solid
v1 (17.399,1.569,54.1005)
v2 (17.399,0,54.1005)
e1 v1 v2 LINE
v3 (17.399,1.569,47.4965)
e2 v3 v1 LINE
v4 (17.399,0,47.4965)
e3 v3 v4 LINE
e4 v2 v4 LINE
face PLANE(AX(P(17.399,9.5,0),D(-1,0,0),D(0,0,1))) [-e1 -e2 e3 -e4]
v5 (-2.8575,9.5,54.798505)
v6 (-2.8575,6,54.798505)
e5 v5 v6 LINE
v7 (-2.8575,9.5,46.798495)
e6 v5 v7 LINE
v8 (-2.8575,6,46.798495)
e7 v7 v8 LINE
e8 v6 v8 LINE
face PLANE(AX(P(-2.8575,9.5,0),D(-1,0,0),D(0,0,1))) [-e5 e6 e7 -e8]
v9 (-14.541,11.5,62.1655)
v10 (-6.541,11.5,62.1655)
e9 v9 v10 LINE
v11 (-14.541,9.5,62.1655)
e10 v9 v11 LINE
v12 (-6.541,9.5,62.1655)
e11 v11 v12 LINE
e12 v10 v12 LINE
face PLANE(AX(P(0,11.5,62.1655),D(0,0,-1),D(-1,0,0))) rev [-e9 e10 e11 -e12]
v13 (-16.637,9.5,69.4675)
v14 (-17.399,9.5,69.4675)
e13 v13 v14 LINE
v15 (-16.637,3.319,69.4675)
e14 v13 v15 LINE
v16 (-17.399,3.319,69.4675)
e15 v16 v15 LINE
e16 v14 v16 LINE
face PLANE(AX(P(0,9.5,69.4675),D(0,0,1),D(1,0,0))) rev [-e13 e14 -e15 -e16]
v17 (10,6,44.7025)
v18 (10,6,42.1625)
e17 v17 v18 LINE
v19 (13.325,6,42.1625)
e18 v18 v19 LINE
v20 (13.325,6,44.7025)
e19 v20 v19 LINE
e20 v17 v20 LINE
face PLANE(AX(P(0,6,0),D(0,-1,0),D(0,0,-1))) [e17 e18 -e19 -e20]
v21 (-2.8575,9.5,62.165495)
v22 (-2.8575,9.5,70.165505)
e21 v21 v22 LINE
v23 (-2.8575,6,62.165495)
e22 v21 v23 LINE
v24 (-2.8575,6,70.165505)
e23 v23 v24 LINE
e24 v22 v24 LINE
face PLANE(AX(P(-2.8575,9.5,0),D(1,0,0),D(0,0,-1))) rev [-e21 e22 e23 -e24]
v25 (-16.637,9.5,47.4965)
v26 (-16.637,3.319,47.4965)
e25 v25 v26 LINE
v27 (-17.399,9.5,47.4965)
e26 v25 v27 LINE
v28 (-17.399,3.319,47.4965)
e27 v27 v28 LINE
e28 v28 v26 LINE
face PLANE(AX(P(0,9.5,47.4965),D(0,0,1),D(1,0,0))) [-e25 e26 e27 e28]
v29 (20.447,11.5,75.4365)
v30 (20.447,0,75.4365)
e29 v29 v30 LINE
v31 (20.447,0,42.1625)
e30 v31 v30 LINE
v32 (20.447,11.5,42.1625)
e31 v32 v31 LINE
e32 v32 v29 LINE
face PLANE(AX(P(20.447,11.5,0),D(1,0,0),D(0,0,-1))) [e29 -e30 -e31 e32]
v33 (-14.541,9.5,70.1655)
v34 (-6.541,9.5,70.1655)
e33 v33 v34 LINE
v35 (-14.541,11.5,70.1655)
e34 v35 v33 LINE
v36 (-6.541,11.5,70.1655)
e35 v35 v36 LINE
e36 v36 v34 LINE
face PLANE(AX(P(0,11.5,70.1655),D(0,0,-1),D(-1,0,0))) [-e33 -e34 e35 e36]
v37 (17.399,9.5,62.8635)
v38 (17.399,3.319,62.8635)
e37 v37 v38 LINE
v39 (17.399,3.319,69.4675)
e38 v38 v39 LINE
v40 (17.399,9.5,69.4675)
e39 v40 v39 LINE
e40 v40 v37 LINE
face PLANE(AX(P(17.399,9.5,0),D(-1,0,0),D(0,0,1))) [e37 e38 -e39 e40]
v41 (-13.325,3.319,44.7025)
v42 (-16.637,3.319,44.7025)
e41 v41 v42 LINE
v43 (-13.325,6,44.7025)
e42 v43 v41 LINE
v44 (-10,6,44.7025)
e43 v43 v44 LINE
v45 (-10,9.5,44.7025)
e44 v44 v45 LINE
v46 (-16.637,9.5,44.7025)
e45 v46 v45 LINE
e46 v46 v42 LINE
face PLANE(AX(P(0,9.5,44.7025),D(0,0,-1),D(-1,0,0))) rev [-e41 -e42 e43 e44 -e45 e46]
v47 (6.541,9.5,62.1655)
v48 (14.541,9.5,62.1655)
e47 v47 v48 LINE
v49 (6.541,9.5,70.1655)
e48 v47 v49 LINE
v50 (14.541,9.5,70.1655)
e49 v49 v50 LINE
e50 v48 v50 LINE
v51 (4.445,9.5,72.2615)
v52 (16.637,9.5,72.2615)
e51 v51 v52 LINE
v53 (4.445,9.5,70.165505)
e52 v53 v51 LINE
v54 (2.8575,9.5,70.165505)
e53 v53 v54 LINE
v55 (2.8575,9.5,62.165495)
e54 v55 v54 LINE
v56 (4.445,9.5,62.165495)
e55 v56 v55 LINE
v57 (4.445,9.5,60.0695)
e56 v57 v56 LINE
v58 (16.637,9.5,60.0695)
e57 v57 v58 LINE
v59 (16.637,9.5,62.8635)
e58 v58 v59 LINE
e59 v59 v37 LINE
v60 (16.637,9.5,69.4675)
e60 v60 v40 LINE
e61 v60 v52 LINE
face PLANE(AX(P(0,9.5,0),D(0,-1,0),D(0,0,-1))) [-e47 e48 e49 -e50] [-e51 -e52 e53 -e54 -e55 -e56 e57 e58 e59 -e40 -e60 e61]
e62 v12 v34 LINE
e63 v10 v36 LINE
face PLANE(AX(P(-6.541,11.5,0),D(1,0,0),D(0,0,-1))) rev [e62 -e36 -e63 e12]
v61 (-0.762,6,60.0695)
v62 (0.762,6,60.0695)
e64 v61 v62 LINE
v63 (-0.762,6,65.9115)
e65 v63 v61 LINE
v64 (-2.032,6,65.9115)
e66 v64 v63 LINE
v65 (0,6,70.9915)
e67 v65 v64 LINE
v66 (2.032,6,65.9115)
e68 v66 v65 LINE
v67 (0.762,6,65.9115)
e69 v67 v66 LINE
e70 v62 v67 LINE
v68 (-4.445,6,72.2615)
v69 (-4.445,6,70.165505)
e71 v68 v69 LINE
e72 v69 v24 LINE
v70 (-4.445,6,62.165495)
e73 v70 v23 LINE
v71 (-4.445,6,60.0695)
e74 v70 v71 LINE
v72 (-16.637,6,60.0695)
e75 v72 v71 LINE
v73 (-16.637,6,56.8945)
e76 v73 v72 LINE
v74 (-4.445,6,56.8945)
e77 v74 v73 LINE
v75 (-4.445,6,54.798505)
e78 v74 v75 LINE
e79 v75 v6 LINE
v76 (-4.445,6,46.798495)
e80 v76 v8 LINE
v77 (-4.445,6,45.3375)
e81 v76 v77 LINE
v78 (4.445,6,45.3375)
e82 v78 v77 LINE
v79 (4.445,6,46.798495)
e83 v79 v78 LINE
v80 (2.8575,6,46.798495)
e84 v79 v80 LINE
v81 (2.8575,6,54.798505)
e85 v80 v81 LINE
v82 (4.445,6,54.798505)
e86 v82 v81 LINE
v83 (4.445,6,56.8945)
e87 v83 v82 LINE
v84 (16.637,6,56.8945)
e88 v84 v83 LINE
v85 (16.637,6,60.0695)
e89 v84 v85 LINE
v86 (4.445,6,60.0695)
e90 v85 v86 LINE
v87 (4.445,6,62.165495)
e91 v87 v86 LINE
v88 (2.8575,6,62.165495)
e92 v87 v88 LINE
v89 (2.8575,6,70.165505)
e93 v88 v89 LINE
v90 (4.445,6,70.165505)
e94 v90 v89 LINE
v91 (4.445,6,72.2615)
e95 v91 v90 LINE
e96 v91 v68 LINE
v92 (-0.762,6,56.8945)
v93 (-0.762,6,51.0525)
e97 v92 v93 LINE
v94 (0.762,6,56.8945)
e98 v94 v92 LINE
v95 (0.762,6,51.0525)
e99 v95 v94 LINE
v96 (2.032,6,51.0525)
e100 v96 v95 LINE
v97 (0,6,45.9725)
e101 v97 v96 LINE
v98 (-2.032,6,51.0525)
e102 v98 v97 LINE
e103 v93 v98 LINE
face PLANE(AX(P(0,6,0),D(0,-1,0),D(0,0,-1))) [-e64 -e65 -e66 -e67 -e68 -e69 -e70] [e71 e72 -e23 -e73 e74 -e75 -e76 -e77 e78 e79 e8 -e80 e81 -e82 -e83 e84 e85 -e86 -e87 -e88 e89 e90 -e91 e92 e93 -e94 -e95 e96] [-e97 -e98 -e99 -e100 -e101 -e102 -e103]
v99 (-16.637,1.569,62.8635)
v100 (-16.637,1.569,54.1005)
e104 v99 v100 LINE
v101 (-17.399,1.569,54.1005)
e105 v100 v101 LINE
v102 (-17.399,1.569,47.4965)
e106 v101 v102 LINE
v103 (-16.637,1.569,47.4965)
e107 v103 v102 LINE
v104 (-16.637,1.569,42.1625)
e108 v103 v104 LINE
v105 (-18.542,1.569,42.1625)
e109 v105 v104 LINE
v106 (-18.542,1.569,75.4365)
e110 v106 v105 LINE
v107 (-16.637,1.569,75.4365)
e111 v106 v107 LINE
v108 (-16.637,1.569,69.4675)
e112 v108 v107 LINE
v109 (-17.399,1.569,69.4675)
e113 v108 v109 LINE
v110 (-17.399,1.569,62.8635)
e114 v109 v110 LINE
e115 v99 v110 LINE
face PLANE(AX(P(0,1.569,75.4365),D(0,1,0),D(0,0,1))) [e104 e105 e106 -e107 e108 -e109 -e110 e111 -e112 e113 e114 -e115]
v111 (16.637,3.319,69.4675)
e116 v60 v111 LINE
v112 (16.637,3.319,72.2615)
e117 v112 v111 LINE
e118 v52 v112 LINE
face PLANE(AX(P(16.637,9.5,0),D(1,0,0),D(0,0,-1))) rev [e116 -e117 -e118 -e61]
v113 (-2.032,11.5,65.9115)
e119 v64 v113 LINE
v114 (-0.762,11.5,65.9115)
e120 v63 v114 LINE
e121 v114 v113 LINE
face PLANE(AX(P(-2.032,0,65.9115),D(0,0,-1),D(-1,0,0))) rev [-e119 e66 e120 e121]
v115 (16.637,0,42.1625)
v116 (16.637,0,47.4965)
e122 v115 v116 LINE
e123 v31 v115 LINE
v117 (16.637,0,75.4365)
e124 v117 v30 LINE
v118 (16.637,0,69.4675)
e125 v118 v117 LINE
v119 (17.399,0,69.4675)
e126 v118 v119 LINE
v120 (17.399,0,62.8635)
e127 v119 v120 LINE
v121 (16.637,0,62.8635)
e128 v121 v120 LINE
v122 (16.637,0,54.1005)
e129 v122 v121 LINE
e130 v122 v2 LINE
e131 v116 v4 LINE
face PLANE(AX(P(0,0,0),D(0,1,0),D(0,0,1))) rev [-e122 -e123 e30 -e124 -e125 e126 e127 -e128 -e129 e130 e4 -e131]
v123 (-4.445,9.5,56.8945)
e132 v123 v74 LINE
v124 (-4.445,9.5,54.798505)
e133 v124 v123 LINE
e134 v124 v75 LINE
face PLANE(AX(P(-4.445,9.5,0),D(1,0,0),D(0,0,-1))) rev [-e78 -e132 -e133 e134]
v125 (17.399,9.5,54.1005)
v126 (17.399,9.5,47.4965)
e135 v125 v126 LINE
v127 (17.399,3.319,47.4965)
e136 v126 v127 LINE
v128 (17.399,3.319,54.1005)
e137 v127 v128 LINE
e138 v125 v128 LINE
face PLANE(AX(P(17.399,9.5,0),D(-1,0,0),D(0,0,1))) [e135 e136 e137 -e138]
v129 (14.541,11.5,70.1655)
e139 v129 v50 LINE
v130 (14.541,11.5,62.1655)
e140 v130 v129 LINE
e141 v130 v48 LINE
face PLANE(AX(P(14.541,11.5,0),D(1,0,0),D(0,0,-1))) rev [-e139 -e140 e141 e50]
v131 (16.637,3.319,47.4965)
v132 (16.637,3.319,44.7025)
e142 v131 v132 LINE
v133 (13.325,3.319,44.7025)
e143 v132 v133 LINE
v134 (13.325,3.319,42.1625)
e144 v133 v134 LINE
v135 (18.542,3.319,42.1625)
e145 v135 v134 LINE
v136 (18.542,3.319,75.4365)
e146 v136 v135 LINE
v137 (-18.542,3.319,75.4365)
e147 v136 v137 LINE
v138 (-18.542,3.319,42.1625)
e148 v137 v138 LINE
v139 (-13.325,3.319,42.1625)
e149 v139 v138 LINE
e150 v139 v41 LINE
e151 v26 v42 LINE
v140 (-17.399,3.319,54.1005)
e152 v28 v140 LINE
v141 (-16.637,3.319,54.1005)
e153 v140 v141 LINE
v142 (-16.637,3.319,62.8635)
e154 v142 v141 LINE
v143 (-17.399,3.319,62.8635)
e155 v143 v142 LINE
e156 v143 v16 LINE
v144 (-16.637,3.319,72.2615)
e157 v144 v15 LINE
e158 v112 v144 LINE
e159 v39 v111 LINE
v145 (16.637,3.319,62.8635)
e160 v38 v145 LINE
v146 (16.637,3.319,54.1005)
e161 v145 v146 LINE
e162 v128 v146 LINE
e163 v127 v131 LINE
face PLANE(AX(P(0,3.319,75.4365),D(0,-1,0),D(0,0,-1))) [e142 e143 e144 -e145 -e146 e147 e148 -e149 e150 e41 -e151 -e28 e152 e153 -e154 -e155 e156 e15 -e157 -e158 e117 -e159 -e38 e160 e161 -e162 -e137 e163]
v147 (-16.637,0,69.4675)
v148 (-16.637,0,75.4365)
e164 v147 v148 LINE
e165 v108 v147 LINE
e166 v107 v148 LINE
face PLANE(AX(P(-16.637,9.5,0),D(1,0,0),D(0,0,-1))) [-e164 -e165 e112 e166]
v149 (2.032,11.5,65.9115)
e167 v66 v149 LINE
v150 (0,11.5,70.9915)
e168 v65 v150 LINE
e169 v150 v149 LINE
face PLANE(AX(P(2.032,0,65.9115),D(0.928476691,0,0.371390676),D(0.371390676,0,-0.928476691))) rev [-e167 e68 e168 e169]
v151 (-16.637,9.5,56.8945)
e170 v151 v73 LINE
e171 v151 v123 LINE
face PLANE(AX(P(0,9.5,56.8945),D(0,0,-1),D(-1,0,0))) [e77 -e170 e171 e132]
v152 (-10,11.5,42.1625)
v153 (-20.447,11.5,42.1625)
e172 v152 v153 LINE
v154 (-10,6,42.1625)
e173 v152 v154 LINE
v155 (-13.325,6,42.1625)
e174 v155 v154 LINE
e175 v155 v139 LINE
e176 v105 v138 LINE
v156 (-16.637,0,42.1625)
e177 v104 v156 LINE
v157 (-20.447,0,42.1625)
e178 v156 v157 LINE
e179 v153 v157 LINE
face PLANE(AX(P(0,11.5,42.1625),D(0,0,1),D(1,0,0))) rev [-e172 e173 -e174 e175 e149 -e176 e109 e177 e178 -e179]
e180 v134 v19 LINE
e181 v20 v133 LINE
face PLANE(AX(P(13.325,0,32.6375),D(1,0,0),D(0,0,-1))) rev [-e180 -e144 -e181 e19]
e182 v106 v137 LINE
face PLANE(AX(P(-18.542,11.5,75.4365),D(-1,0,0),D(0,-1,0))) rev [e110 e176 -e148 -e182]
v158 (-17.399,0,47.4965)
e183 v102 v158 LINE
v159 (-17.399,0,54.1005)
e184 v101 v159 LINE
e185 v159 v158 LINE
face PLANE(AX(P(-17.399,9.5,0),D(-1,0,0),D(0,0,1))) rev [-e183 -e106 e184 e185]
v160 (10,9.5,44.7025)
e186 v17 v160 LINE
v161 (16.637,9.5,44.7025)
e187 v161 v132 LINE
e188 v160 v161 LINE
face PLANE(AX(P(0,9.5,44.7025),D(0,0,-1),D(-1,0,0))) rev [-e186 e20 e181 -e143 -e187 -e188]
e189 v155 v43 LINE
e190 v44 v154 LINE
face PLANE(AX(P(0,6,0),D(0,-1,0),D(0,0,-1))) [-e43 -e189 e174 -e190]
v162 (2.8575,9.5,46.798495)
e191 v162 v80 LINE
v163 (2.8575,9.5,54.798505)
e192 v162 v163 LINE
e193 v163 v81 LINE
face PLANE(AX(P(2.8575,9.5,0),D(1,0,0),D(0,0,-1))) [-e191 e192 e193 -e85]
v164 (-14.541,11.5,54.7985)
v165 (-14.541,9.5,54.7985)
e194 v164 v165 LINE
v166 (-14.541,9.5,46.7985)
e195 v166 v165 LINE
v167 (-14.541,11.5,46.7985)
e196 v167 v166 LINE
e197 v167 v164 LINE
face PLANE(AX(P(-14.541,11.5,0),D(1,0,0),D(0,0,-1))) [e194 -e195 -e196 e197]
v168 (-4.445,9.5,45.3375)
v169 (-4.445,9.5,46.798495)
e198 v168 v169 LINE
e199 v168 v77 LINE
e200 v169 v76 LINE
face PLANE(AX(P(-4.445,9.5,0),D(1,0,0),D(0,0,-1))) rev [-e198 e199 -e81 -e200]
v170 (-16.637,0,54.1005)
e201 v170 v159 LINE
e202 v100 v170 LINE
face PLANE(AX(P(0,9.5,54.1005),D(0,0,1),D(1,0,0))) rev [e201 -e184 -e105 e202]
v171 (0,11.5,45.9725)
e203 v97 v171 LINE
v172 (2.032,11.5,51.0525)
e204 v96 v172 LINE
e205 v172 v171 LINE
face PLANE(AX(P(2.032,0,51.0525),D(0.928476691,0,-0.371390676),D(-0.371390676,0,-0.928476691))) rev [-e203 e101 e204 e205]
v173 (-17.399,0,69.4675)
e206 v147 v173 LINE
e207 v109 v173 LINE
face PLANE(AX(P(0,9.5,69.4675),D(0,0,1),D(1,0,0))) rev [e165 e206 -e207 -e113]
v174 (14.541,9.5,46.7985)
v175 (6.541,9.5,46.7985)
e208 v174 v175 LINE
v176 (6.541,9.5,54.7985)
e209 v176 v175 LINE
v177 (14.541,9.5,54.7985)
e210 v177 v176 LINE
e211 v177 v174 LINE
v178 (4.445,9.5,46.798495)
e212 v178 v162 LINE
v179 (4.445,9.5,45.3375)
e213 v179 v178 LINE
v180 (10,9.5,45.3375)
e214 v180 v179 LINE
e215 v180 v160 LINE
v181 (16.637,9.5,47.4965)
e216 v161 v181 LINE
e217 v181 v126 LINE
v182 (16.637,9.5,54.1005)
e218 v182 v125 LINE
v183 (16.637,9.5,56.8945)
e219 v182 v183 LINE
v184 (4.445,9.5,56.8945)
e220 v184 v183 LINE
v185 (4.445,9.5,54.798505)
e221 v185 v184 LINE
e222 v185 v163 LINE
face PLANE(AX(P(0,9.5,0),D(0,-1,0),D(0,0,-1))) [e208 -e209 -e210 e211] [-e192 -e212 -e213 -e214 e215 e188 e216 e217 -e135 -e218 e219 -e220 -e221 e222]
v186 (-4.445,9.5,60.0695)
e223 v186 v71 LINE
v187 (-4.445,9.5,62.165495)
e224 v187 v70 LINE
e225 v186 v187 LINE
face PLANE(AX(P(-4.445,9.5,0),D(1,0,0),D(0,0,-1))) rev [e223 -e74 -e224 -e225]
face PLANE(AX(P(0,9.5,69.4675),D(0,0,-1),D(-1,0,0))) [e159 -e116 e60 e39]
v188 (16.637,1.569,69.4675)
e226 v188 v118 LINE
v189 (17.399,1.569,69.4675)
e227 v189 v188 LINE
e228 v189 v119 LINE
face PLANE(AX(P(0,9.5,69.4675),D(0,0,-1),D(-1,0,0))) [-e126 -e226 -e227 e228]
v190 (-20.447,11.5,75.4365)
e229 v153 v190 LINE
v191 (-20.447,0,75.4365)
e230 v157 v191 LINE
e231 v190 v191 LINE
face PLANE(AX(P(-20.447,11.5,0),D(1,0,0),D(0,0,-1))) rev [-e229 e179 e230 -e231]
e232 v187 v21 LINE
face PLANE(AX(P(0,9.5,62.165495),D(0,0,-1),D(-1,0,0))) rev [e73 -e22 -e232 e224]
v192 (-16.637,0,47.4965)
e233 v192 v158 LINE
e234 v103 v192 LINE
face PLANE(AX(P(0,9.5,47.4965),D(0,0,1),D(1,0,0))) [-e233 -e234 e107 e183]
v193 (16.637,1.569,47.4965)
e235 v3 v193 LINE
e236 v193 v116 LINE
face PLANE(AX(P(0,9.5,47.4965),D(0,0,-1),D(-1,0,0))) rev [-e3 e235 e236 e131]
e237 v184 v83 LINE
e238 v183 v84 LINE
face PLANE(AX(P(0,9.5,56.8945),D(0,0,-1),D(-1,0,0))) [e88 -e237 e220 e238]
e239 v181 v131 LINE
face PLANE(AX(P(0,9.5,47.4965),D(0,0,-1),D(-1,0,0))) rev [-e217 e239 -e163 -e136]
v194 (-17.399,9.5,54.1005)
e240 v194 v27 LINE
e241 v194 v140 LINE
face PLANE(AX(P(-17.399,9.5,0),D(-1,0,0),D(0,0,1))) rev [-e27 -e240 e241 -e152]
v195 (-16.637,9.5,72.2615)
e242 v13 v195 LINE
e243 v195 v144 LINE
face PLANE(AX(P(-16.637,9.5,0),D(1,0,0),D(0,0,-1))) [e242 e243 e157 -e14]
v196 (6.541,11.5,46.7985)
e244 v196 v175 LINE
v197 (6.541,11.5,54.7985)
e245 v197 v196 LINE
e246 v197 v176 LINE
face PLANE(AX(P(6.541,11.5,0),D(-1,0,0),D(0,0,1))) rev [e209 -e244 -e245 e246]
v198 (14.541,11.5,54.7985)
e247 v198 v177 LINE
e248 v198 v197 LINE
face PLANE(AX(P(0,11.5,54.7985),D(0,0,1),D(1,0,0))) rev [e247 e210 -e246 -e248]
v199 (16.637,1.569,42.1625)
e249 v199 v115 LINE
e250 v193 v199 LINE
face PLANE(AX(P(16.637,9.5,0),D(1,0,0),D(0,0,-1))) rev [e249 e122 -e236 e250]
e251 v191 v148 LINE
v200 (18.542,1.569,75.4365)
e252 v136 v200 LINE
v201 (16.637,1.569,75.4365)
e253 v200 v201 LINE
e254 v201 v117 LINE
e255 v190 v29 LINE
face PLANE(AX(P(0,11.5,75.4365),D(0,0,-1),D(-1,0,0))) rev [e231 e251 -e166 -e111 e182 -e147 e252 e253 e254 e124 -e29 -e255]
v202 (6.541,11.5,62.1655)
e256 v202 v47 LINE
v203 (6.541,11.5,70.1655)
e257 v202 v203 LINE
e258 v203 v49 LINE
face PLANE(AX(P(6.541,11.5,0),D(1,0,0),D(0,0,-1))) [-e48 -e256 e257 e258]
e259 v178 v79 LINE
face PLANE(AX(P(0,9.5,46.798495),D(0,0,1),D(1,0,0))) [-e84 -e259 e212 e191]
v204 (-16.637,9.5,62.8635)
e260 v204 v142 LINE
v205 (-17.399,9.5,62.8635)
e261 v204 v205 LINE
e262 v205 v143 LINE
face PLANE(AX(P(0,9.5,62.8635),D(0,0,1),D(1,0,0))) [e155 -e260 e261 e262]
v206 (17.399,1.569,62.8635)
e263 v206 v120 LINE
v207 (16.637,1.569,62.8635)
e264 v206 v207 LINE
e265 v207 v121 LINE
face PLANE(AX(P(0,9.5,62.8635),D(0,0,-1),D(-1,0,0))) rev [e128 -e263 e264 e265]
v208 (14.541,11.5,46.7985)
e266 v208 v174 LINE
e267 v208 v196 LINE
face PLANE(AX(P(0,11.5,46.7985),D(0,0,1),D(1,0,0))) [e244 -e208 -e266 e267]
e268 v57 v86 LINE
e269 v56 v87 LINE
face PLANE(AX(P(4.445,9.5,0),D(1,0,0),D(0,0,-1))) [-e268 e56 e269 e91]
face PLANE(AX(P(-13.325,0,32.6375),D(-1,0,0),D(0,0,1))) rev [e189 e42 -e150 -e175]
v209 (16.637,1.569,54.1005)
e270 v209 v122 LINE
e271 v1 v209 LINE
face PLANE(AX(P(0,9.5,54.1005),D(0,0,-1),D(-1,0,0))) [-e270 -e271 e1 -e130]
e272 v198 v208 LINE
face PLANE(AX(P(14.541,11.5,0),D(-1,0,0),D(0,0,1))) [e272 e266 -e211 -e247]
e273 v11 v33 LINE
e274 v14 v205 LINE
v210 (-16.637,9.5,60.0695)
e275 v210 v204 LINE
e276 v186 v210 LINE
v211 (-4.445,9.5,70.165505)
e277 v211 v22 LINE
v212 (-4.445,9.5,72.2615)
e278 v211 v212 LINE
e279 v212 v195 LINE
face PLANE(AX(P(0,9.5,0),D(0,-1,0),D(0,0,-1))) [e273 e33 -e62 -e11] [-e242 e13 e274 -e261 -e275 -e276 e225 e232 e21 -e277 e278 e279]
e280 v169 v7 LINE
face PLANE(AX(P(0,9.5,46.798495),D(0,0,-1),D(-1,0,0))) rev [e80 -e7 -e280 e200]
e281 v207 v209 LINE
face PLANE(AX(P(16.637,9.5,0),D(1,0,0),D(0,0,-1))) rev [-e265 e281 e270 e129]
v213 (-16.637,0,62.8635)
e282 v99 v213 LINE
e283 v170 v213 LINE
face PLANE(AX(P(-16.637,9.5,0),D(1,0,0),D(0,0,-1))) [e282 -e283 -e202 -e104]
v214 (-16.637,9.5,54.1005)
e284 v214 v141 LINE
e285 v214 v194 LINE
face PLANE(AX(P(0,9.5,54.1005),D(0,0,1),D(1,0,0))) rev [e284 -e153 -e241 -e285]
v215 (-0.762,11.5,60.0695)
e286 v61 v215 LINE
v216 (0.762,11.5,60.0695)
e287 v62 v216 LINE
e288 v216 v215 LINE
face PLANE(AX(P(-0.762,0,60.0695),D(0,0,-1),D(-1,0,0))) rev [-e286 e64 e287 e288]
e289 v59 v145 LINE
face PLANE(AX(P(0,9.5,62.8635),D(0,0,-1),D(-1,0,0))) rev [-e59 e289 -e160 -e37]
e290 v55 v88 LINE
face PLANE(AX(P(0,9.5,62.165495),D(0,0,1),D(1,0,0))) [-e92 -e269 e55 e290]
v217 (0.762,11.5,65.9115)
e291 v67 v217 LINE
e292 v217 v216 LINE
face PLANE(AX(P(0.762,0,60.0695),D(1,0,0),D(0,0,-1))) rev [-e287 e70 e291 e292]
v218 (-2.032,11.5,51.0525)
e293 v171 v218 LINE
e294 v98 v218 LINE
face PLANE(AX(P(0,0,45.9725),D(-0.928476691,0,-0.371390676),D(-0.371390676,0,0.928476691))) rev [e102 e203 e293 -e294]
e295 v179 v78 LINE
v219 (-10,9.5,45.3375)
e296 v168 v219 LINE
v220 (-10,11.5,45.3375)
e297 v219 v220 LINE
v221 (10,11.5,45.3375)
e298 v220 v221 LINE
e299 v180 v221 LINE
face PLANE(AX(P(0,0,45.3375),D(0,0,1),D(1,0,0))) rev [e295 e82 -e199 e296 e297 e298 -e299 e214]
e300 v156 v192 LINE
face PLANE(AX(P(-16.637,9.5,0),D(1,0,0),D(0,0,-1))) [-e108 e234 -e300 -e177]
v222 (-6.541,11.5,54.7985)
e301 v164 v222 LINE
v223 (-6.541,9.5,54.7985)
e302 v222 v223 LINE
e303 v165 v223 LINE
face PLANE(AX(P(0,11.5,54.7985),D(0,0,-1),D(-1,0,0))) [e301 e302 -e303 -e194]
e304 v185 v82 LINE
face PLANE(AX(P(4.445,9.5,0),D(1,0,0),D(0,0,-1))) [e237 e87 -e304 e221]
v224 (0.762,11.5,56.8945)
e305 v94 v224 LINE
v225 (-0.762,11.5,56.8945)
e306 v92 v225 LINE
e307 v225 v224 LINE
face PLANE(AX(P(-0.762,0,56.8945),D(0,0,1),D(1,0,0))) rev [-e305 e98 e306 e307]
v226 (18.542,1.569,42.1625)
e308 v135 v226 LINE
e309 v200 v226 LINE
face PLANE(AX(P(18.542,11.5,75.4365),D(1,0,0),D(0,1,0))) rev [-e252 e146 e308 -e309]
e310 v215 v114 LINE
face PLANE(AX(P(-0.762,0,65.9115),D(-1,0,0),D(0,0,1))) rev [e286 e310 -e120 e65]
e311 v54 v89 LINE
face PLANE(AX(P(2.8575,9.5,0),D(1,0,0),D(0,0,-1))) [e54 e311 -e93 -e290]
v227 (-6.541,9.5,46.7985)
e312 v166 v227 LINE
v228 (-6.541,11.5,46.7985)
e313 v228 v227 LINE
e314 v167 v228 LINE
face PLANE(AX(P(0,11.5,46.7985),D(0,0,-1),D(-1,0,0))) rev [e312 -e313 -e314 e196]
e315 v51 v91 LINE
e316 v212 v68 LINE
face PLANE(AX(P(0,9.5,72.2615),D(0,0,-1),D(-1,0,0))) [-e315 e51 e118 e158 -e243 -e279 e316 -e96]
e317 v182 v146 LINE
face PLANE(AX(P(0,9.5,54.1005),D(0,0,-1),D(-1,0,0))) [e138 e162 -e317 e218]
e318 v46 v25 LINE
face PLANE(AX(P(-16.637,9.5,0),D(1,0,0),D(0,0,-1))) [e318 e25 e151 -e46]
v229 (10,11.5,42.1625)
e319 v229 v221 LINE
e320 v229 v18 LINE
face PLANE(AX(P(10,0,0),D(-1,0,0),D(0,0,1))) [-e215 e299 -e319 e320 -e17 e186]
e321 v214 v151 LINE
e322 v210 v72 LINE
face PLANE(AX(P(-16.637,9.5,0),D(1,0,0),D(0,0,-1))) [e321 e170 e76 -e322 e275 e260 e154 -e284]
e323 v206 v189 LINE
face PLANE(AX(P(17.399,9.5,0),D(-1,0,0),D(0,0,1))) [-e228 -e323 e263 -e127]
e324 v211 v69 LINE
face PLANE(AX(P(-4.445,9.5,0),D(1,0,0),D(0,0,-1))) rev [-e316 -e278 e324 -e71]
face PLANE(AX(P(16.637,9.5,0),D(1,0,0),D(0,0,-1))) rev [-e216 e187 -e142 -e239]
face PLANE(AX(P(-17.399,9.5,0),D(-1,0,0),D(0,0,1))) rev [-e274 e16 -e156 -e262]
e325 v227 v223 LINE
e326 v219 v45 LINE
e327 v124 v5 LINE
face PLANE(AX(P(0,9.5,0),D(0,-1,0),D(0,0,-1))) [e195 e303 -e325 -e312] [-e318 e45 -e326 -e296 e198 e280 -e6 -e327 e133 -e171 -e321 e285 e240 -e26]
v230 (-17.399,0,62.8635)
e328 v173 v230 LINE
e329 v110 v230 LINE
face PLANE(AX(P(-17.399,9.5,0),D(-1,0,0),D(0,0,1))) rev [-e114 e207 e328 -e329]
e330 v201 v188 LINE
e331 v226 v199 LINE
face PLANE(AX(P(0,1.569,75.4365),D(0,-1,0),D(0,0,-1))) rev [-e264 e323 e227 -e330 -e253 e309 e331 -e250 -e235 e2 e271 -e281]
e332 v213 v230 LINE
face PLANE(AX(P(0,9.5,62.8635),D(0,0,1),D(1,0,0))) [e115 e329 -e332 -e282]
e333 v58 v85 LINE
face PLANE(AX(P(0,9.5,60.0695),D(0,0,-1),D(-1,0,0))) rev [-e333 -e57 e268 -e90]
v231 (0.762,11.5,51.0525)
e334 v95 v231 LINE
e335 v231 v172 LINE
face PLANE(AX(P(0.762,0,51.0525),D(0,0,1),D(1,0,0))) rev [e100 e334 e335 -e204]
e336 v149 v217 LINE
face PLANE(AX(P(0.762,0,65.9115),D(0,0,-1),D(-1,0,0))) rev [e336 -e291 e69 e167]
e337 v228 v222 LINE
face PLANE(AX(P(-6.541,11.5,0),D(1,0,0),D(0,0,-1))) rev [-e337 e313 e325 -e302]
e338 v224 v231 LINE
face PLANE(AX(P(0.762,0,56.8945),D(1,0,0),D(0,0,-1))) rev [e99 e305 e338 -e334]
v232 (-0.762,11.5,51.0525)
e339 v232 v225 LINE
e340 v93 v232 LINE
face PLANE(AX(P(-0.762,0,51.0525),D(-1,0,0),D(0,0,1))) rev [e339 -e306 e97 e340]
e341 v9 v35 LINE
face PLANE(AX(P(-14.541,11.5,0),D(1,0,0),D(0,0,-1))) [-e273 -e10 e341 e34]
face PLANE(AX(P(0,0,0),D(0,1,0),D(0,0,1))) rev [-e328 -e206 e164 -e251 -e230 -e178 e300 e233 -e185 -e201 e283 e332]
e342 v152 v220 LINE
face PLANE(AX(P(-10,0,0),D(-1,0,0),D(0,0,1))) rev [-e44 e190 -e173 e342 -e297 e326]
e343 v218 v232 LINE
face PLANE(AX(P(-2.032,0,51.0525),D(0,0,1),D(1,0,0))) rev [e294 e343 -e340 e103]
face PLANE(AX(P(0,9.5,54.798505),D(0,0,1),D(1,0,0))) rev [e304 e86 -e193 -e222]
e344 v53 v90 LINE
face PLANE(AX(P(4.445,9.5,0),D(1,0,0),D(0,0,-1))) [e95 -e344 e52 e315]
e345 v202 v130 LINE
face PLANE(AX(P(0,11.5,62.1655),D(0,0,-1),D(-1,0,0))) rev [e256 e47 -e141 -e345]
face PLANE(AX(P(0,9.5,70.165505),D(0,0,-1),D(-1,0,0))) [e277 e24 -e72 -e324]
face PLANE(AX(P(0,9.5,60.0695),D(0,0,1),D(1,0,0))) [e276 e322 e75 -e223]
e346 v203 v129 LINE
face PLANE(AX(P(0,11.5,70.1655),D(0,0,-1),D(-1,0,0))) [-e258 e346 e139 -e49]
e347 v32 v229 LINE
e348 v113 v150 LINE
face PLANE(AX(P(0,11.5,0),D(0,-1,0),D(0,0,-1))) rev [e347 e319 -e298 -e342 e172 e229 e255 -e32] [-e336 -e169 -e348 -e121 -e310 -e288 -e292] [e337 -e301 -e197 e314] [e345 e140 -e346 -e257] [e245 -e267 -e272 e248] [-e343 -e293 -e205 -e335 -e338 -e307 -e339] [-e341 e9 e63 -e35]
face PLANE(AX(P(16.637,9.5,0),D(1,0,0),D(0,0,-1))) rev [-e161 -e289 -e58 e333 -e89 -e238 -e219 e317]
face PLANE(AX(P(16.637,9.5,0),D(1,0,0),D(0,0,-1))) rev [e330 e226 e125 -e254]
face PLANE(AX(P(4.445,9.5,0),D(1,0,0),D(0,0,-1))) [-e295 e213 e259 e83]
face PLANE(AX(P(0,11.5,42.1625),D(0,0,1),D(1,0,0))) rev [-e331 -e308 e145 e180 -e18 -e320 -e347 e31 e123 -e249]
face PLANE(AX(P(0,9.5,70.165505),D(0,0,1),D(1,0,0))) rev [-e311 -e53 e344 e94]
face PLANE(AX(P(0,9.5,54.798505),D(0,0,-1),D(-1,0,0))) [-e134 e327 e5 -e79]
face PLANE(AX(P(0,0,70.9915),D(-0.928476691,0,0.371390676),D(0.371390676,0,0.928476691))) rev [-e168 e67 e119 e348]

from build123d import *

# Parameters (mm, degrees)
SKETCH1_W               = 64.75
SKETCH1_H               = 84.325
SKETCH1_R               = 1.35
BOSS_EXTRUDE1_DEPTH     = 25.4
CUT_EXTRUDE1_DEPTH      = 82.335102547
SKETCH5_W               = 58.925
SKETCH5_H               = 20.6375
CUT_EXTRUDE3_DEPTH      = 82.335102547
BOSS_EXTRUDE2_START     = 4.7625
SKETCH1_3_W             = 6.75
SKETCH1_3_H             = 6.75
SKETCH1_3_R             = 1.35
SKETCH1_3_H_2           = 3.175
BOSS_EXTRUDE2_DEPTH     = 9.525
CUT_EXTRUDE6_DEPTH      = 55.65443286
CUT_EXTRUDE6_DEPTH_BACK = 55.65443286
SKETCH7_W               = 26.65
SKETCH7_H               = 62.1
SKETCH8_W               = 40.894
SKETCH8_H               = 33.274
SKETCH8_W_2             = 8
SKETCH8_H_2             = 8
BOSS_EXTRUDE3_DEPTH     = 11.5
SKETCH8_3_W             = 8
SKETCH8_3_H             = 8
CUT_EXTRUDE7_DEPTH      = 9.5
CUT_EXTRUDE8_DEPTH      = 6
SKETCH9_W               = 26.65
SKETCH9_H               = 86.865
CUT_EXTRUDE9_DEPTH      = 6
CUT_EXTRUDE10_DEPTH     = 84.258730216
SKETCH11_W              = 64.75
SKETCH11_H              = 84.325
CUT_EXTRUDE11_DEPTH     = 86.930007316
BOSS_EXTRUDE4_DEPTH     = 40.894
SKETCH15_W              = 7.376
SKETCH15_H              = 9.883286215
SKETCH15_W_2            = 20
SKETCH15_H_2            = 9.293713785
CUT_EXTRUDE12_DEPTH     = 79.999970514
CUT_EXTRUDE14_START     = -33.274
CUT_EXTRUDE14_DEPTH     = 80.122835409
FILLET1_R               = 3.175
FILLET2_R               = 2.54
SKETCH22_W              = 9.202496002
SKETCH22_H              = 15.787790907
CUT_EXTRUDE17_DEPTH     = 87.575023929


with BuildPart() as part:
    # Sketch1 → Boss-Extrude1 (new body)
    with BuildSketch(Plane(origin=(0, 0, 0), x_dir=(1, 0, 0), z_dir=(0, 1, 0))):
        Rectangle(SKETCH1_W, SKETCH1_H)
        with Locations(Location((-29, 10.2125, 0), (0, 0, 270))):
            Circle(SKETCH1_R, mode=Mode.SUBTRACT)
        with Locations(Location((29, 10.2125, 0), (0, 0, 270))):
            Circle(SKETCH1_R, mode=Mode.SUBTRACT)
        with Locations(Location((-29, -38.7875, 0), (0, 0, 270))):
            Circle(SKETCH1_R, mode=Mode.SUBTRACT)
        with Locations(Location((29, -38.7875, 0), (0, 0, 270))):
            Circle(SKETCH1_R, mode=Mode.SUBTRACT)
    extrude(amount=BOSS_EXTRUDE1_DEPTH)

    # Sketch3 → Cut-Extrude1 (cut, through all)
    with BuildSketch(Plane(origin=(32.375, 0, 0), x_dir=(0, 0, -1), z_dir=(1, 0, 0))):
        Polygon((42.1625, 18.034), (23.1125, 18.669), (23.1125, 12.7), (42.1625, 12.7), align=None)
    extrude(amount=-CUT_EXTRUDE1_DEPTH, mode=Mode.SUBTRACT)

    # Sketch5 → Cut-Extrude3 (cut, through all)
    with BuildSketch(Plane(origin=(32.375, 0, 0), x_dir=(0, 0, -1), z_dir=(1, 0, 0))):
        with Locations((-12.7, 15.08125)):
            Rectangle(SKETCH5_W, SKETCH5_H)
    extrude(amount=-CUT_EXTRUDE3_DEPTH, mode=Mode.SUBTRACT)

    # Sketch1<3> → Boss-Extrude2 (add)
    # profile 1 of 6: a face of its own
    with BuildSketch(Plane(origin=(0, 0, 0), x_dir=(1, 0, 0), z_dir=(0, 1, 0)).offset(BOSS_EXTRUDE2_START)):
        with Locations((29, -38.7875)):
            Rectangle(SKETCH1_3_W, SKETCH1_3_H)
        with Locations(Location((29, -38.7875, 0), (0, 0, 90))):
            Circle(SKETCH1_3_R, mode=Mode.SUBTRACT)
    # profile 2 of 6: a face of its own
    with BuildSketch(Plane(origin=(0, 0, 0), x_dir=(1, 0, 0), z_dir=(0, 1, 0)).offset(BOSS_EXTRUDE2_START)):
        with Locations((-29, -38.7875)):
            Rectangle(SKETCH1_3_W, SKETCH1_3_H)
        with Locations(Location((-29, -38.7875, 0), (0, 0, 90))):
            Circle(SKETCH1_3_R, mode=Mode.SUBTRACT)
    # profile 3 of 6: a face of its own
    with BuildSketch(Plane(origin=(0, 0, 0), x_dir=(1, 0, 0), z_dir=(0, 1, 0)).offset(BOSS_EXTRUDE2_START)):
        with Locations((-29, 10.2125)):
            Rectangle(SKETCH1_3_W, SKETCH1_3_H)
        with Locations(Location((-29, 10.2125, 0), (0, 0, 90))):
            Circle(SKETCH1_3_R, mode=Mode.SUBTRACT)
    # profile 4 of 6: a face of its own
    with BuildSketch(Plane(origin=(0, 0, 0), x_dir=(1, 0, 0), z_dir=(0, 1, 0)).offset(BOSS_EXTRUDE2_START)):
        with Locations((29, 10.2125)):
            Rectangle(SKETCH1_3_W, SKETCH1_3_H)
        with Locations(Location((29, 10.2125, 0), (0, 0, 90))):
            Circle(SKETCH1_3_R, mode=Mode.SUBTRACT)
    # profile 5 of 6: a face of its own
    with BuildSketch(Plane(origin=(0, 0, 0), x_dir=(1, 0, 0), z_dir=(0, 1, 0)).offset(BOSS_EXTRUDE2_START)):
        with Locations((-29, 15.175)):
            Rectangle(SKETCH1_3_W, SKETCH1_3_H_2)
    # profile 6 of 6: a face of its own
    with BuildSketch(Plane(origin=(0, 0, 0), x_dir=(1, 0, 0), z_dir=(0, 1, 0)).offset(BOSS_EXTRUDE2_START)):
        with Locations((29, 15.175)):
            Rectangle(SKETCH1_3_W, SKETCH1_3_H_2)
    extrude(amount=BOSS_EXTRUDE2_DEPTH)

    # Sketch7 → Cut-Extrude6 (cut, two sides: drawn at the far end of the back side and taken through both)
    with BuildSketch(Plane(origin=(0, 12.7, 0), x_dir=(1, 0, 0), z_dir=(0, 1, 0)).offset(-CUT_EXTRUDE6_DEPTH_BACK)):
        with Locations((0, -1.5875)):
            Rectangle(SKETCH7_W, SKETCH7_H)
    extrude(amount=CUT_EXTRUDE6_DEPTH + CUT_EXTRUDE6_DEPTH_BACK, mode=Mode.SUBTRACT)

    # Sketch8 → Boss-Extrude3 (add)
    with BuildSketch(Plane.XZ):
        with Locations((0, 58.7995)):
            Rectangle(SKETCH8_W, SKETCH8_H)
        with Locations((-10.541, 50.7985)):
            Rectangle(SKETCH8_W_2, SKETCH8_H_2, mode=Mode.SUBTRACT)
        with Locations((10.541, 50.7985)):
            Rectangle(SKETCH8_W_2, SKETCH8_H_2, mode=Mode.SUBTRACT)
        with Locations((-10.541, 66.1655)):
            Rectangle(SKETCH8_W_2, SKETCH8_H_2, mode=Mode.SUBTRACT)
        with Locations((10.541, 66.1655)):
            Rectangle(SKETCH8_W_2, SKETCH8_H_2, mode=Mode.SUBTRACT)
    extrude(amount=-BOSS_EXTRUDE3_DEPTH)

    # Sketch8<3> → Cut-Extrude7 (cut)
    # profile 1 of 4: a face of its own
    with BuildSketch(Plane.XZ):
        Polygon((-16.637, 47.4965), (-16.637, 44.7025), (-4.445, 44.7025), (-4.445, 46.7984953), (-2.8575, 46.7984953), (-2.8575, 54.7985047), (-4.445, 54.7985047), (-4.445, 56.8945), (-16.637, 56.8945), (-16.637, 54.1005), (-17.399, 54.1005), (-17.399, 47.4965), align=None)
        with Locations((-10.541, 50.7985)):
            Rectangle(SKETCH8_3_W, SKETCH8_3_H, mode=Mode.SUBTRACT)
    # profile 2 of 4: a face of its own
    with BuildSketch(Plane.XZ):
        Polygon((4.445, 56.8945), (4.445, 54.7985047), (2.8575, 54.7985047), (2.8575, 46.7984953), (4.445, 46.7984953), (4.445, 44.7025), (16.637, 44.7025), (16.637, 47.4965), (17.399, 47.4965), (17.399, 54.1005), (16.637, 54.1005), (16.637, 56.8945), align=None)
        with Locations((10.541, 50.7985)):
            Rectangle(SKETCH8_3_W, SKETCH8_3_H, mode=Mode.SUBTRACT)
    # profile 3 of 4: a face of its own
    with BuildSketch(Plane.XZ):
        Polygon((-16.637, 72.2615), (-16.637, 69.4675), (-17.399, 69.4675), (-17.399, 62.8635), (-16.637, 62.8635), (-16.637, 60.0695), (-4.445, 60.0695), (-4.445, 62.1654953), (-2.8575, 62.1654953), (-2.8575, 70.1655047), (-4.445, 70.1655047), (-4.445, 72.2615), align=None)
        with Locations((-10.541, 66.1655)):
            Rectangle(SKETCH8_3_W, SKETCH8_3_H, mode=Mode.SUBTRACT)
    # profile 4 of 4: a face of its own
    with BuildSketch(Plane.XZ):
        Polygon((4.445, 72.2615), (4.445, 70.1655047), (2.8575, 70.1655047), (2.8575, 62.1654953), (4.445, 62.1654953), (4.445, 60.0695), (16.637, 60.0695), (16.637, 62.8635), (17.399, 62.8635), (17.399, 69.4675), (16.637, 69.4675), (16.637, 72.2615), align=None)
        with Locations((10.541, 66.1655)):
            Rectangle(SKETCH8_3_W, SKETCH8_3_H, mode=Mode.SUBTRACT)
    extrude(amount=-CUT_EXTRUDE7_DEPTH, mode=Mode.SUBTRACT)

    # Sketch8<4> → Cut-Extrude8 (cut)
    with BuildSketch(Plane.XZ):
        Polygon((-4.445, 46.7984953), (-4.445, 44.7025), (4.445, 44.7025), (4.445, 46.7984953), (2.8575, 46.7984953), (2.8575, 54.7985047), (4.445, 54.7985047), (4.445, 56.8945), (16.637, 56.8945), (16.637, 60.0695), (4.445, 60.0695), (4.445, 62.1654953), (2.8575, 62.1654953), (2.8575, 70.1655047), (4.445, 70.1655047), (4.445, 72.2615), (-4.445, 72.2615), (-4.445, 70.1655047), (-2.8575, 70.1655047), (-2.8575, 62.1654953), (-4.445, 62.1654953), (-4.445, 60.0695), (-16.637, 60.0695), (-16.637, 56.8945), (-4.445, 56.8945), (-4.445, 54.7985047), (-2.8575, 54.7985047), (-2.8575, 46.7984953), align=None)
    extrude(amount=-CUT_EXTRUDE8_DEPTH, mode=Mode.SUBTRACT)

    # Sketch9 → Cut-Extrude9 (cut)
    with BuildSketch(Plane.XZ):
        with Locations((0, 1.27)):
            Rectangle(SKETCH9_W, SKETCH9_H)
    extrude(amount=-CUT_EXTRUDE9_DEPTH, mode=Mode.SUBTRACT)

    # Sketch10 → Cut-Extrude10 (cut, through all)
    with BuildSketch(Plane(origin=(0, 11.5, 0), x_dir=(1, 0, 0), z_dir=(0, 1, 0))):
        Polygon((-0.762, -56.8945), (0.762, -56.8945), (0.762, -51.0525), (2.032, -51.0525), (0, -45.9725), (-2.032, -51.0525), (-0.762, -51.0525), align=None)
        Polygon((-0.762, -65.9115), (-0.762, -60.0695), (0.762, -60.0695), (0.762, -65.9115), (2.032, -65.9115), (0, -70.9915), (-2.032, -65.9115), align=None)
    extrude(amount=-CUT_EXTRUDE10_DEPTH, mode=Mode.SUBTRACT)

    # Sketch11 → Cut-Extrude11 (cut, through all)
    with BuildSketch(Plane.XZ):
        Rectangle(SKETCH11_W, SKETCH11_H)
    extrude(amount=-CUT_EXTRUDE11_DEPTH, mode=Mode.SUBTRACT)

    # Sketch14 → Boss-Extrude4 (add)
    with BuildSketch(Plane(origin=(20.447, 0, 0), x_dir=(0, 0, -1), z_dir=(1, 0, 0))):
        with BuildLine():
            Line((-38.942699076, 7.350099538), (-39.3685, 2.3))
            Line((-39.3685, 2.3), (-36.819487459, 2.3))
            Line((-36.819487459, 2.3), (-36.043786215, 11.5))
            Line((-36.043786215, 11.5), (-42.1625, 11.5))
            Line((-42.1625, 11.5), (-42.1625, 7.350099538))
            ThreePointArc((-42.1625, 7.350099538), (-40.552599538, 8.96), (-38.942699076, 7.350099538))
        make_face()
    extrude(amount=-BOSS_EXTRUDE4_DEPTH)

    # Sketch15 → Cut-Extrude12 (cut, through all)
    with BuildSketch(Plane(origin=(0, 11.5, 0), x_dir=(1, 0, 0), z_dir=(0, 1, 0))):
        with Locations((16.759, -31.102143108)):
            Rectangle(SKETCH15_W, SKETCH15_H)
        with Locations((-16.759, -31.102143108)):
            Rectangle(SKETCH15_W, SKETCH15_H)
        with Locations((0, -40.690643108)):
            Rectangle(SKETCH15_W_2, SKETCH15_H_2)
        with Locations((0, -40.690643108)):
            Rectangle(SKETCH15_W_2, SKETCH15_H_2)
    extrude(amount=-CUT_EXTRUDE12_DEPTH, mode=Mode.SUBTRACT)

    # Sketch18 → Cut-Extrude14 (cut, through all)
    with BuildSketch(Plane.XY.offset(75.4365).offset(CUT_EXTRUDE14_START)):
        Polygon((18.542, 1.569), (18.542, 3.319), (-18.542, 3.319), (-18.542, 1.569), (-16.637, 1.569), (-16.637, 0), (16.637, 0), (16.637, 1.569), align=None)
    extrude(amount=CUT_EXTRUDE14_DEPTH, mode=Mode.SUBTRACT)

    # Fillet1
    fillet1_edges = [part.edges().sort_by_distance(p)[0] for p in [
        (-15.2235, 11.5, 36.043786215),
        (15.2235, 11.5, 36.043786215),
    ]]
    fillet(fillet1_edges, radius=FILLET1_R)

    # Fillet2
    # the kernel refuses this fillet: 2.54 mm, written as the material it takes off along each edge
    with BuildSketch(Plane(origin=(-3.11459751, 2.3, 39.3685), x_dir=(0, 0, -1), z_dir=(-1, 0, 0)), Plane(origin=(27.33240249, 2.3, 39.3685), x_dir=(0, 0, -1), z_dir=(-1, 0, 0))) as fillet2_piece_1:
        with BuildLine():
            CenterArc((2.762416328, -2.531019325), FILLET2_R, 94.819514659, 90)
            Line((0.231397003, -2.744423112), (0.180776616, -2.748691188))
            Line((0.180776616, -2.748691188), (-0.050620387, -0.004268076))
            Line((-0.050620387, -0.004268076), (0, 0.0508))
            ThreePointArc((0, 0.0508), (1.27450627, 0.0508), (2.544744465, 0.050620387))
            Line((2.544744465, 0.050620387), (2.549012541, 0))
        make_face()
    extrude(amount=24.217804979, mode=Mode.SUBTRACT)

    # Sketch22 → Cut-Extrude17 (cut, through all)
    with BuildSketch(Plane.ZY.offset(20.447)):
        with Locations((37.561251999, 7.893895454)):
            Rectangle(SKETCH22_W, SKETCH22_H)
    extrude(amount=-CUT_EXTRUDE17_DEPTH, mode=Mode.SUBTRACT)


solid = part.part
